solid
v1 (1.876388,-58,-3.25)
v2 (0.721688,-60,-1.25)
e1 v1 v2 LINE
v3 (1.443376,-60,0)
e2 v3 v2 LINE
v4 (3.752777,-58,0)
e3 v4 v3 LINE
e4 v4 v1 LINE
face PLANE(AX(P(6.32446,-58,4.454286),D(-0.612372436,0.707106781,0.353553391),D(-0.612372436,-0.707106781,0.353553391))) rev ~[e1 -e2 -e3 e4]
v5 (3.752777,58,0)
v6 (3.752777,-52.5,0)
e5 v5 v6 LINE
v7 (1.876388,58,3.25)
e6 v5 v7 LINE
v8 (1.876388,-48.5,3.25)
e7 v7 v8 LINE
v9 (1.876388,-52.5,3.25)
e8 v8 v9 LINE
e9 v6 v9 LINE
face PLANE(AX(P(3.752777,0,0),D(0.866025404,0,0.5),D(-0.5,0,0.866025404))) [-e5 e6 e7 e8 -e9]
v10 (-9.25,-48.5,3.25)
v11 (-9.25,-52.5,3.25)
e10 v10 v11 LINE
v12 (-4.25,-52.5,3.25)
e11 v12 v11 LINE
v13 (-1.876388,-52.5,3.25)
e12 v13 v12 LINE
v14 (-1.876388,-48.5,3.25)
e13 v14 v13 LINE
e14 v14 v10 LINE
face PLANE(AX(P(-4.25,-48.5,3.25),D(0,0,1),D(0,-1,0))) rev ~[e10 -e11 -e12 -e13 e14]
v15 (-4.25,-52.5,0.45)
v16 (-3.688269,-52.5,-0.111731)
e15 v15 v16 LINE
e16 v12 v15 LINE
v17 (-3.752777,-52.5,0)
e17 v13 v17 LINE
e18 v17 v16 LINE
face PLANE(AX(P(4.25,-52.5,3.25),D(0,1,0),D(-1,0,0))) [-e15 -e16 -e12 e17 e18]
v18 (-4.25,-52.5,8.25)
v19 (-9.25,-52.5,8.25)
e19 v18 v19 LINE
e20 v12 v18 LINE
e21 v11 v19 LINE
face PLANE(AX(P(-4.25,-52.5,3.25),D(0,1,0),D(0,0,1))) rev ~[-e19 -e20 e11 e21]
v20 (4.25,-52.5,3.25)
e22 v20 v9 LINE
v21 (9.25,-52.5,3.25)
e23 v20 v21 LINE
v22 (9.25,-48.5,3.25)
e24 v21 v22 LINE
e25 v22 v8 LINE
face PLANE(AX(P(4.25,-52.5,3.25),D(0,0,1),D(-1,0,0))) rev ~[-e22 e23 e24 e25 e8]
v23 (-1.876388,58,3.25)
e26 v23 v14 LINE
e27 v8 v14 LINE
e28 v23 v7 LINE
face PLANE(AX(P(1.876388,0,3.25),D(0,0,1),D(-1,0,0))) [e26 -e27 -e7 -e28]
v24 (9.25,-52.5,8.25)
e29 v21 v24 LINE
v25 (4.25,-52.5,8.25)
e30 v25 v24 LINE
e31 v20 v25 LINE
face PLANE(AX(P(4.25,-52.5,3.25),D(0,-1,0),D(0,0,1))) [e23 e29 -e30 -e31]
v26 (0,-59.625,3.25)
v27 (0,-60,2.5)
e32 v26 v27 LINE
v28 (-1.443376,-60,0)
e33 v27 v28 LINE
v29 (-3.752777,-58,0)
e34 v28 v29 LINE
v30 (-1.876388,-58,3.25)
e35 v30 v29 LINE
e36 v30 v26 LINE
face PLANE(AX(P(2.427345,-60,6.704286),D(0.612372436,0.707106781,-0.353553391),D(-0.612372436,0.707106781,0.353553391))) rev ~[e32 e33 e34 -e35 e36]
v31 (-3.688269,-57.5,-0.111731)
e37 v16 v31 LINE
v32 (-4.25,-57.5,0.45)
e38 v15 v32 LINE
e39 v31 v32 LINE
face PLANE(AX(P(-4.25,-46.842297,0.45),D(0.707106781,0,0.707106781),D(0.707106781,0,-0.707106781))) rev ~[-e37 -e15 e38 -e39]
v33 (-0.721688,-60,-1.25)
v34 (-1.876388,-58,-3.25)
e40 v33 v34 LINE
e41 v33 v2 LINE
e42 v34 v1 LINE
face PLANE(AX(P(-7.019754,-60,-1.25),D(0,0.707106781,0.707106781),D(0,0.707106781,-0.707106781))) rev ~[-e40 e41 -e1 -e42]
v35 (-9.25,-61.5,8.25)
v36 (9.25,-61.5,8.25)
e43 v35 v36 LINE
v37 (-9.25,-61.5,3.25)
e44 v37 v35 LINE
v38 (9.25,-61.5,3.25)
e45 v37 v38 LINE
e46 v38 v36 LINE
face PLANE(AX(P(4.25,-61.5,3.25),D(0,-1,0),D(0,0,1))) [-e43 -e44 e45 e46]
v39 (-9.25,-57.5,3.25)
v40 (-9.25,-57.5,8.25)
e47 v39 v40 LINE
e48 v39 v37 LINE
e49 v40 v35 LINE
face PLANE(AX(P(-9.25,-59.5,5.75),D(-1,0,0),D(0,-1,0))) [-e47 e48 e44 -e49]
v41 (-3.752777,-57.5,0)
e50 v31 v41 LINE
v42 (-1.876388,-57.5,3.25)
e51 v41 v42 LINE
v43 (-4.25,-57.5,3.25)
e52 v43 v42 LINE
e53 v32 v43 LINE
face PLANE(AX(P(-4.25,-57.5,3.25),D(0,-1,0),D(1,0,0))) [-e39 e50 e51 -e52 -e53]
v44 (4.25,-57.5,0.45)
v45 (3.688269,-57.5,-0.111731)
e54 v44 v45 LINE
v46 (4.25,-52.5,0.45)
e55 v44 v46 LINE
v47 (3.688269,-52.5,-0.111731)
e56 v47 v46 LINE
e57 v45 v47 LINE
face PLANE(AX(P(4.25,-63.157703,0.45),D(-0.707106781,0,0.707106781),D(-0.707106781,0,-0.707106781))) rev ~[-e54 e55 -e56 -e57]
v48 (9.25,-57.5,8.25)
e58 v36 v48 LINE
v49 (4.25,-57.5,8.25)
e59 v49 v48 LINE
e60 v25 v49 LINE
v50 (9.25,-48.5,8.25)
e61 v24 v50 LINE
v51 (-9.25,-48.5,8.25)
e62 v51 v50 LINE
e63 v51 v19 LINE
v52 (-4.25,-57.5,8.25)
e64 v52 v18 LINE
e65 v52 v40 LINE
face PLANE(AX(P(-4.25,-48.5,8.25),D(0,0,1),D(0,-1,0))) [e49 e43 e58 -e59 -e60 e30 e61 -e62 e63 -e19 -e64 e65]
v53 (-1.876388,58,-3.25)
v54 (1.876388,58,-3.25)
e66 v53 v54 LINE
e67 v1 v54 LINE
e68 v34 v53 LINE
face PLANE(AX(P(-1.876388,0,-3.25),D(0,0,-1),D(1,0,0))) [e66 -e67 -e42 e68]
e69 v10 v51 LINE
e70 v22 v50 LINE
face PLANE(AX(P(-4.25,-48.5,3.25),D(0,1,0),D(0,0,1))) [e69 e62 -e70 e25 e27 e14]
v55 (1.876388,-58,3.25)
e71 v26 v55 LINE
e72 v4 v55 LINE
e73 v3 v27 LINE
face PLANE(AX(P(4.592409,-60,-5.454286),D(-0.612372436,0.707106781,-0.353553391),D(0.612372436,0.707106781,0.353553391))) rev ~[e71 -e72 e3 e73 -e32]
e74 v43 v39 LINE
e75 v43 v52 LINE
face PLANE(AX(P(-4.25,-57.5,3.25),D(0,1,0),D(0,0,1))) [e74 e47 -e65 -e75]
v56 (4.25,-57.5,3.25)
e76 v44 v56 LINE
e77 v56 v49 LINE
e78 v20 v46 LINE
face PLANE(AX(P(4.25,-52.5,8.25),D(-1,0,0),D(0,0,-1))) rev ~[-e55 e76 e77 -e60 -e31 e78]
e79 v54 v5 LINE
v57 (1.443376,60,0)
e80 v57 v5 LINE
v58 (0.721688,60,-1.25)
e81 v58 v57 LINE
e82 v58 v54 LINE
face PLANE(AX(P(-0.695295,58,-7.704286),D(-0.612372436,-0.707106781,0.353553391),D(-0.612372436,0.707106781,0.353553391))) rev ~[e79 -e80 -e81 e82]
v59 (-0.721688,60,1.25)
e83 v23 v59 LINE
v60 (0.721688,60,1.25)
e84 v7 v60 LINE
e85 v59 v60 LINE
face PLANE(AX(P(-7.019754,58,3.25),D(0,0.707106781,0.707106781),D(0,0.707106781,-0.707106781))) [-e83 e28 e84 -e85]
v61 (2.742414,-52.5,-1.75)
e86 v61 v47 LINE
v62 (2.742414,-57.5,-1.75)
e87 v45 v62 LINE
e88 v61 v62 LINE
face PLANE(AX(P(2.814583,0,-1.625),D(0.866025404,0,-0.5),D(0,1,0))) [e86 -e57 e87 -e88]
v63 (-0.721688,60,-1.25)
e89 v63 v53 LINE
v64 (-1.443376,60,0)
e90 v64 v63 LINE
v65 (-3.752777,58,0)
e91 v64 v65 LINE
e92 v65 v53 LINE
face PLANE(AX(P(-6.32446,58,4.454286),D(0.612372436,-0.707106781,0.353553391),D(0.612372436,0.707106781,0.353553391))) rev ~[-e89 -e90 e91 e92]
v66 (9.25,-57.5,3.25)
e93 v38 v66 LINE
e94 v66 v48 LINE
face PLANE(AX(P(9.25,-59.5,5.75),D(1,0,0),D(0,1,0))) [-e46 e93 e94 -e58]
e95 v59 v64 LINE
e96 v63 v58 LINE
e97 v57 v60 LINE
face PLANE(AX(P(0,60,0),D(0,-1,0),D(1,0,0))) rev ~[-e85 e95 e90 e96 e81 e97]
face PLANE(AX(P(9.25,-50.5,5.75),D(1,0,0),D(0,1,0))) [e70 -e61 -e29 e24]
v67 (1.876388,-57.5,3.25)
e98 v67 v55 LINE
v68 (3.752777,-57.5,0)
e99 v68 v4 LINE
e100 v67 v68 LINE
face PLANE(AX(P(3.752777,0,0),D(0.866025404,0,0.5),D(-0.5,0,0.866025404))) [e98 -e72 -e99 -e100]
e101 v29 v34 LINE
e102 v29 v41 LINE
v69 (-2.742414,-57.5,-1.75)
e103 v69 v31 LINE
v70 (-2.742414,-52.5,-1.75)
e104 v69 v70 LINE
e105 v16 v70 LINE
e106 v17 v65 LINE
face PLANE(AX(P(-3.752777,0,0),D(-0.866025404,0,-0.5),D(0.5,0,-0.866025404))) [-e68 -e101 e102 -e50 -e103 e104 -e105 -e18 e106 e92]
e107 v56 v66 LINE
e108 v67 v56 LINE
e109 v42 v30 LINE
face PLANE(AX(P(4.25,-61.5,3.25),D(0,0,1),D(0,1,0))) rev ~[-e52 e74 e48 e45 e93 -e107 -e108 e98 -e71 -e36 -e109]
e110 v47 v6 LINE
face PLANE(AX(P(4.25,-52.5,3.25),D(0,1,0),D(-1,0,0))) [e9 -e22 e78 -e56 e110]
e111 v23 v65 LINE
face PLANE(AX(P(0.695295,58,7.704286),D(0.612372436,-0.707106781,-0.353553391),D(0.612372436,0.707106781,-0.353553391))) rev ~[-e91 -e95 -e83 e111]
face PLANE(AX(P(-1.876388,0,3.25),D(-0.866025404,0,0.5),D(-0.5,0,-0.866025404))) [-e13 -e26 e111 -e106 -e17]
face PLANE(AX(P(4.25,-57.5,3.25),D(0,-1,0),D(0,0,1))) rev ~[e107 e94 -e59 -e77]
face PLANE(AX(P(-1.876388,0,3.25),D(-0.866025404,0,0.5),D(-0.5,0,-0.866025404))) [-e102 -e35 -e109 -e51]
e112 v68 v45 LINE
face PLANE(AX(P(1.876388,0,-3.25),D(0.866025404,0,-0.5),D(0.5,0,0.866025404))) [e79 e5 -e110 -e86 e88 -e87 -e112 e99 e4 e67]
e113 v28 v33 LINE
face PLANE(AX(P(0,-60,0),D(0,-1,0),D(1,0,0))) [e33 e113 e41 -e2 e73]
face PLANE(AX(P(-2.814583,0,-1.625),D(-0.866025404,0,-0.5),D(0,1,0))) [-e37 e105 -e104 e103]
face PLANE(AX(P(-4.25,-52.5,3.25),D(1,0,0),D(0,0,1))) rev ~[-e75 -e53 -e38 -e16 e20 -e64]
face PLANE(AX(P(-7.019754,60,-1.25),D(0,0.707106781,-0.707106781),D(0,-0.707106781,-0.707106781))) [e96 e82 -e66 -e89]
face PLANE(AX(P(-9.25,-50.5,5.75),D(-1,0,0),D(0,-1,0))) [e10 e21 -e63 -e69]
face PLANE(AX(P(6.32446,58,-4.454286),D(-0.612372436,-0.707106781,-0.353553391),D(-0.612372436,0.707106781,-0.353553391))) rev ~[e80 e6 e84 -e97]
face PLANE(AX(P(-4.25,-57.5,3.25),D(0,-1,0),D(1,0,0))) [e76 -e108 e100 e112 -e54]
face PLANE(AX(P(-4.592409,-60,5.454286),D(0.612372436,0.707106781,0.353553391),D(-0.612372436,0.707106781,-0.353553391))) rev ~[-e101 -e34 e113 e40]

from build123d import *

# Parameters (mm, degrees)
F1_DEPTH      = 60
F2_W          = 2.3736116251
F2_H          = 5
F2_W_2        = 3.7527767497
F3_DEPTH      = 5
F5_DEPTH      = 4
F7_DEPTH      = 4
F8_W          = 4
F8_H          = 5
F9_DEPTH      = 5
F10_W         = 4
F10_H         = 5
F11_DEPTH     = 5
F12_T4_DEPTH  = 16.3154051471
F12_T9_DEPTH  = 16.3154051471
F13_T1_DEPTH  = 14.0395087016
F13_T3_DEPTH  = 14.0395087016
F13_T5_DEPTH  = 14.0395087016
F13_T7_DEPTH  = 14.0395087016
F13_T9_DEPTH  = 14.0395087016
F13_T14_DEPTH = 14.0395087016
F13_T19_DEPTH = 14.0395087016
F13_T24_DEPTH = 14.0395087016
F13_T29_DEPTH = 14.0395087016


# Not quite as in the source:
# - a fillet or chamfer that OpenCascade refuses, or shapes differently, is made with other operations: its cross-section is extruded or revolved along the edge and cut away or added


with BuildPart() as f1:
    # F0 (on Front) → F1 (new body, symmetric)
    with BuildSketch(Plane.XZ):
        Polygon((1.8763883749, -3.25), (3.7527767497, 0), (1.8763883749, 3.25), (-1.8763883749, 3.25), (-3.7527767497, 0), (-1.8763883749, -3.25), align=None)
    extrude(amount=F1_DEPTH, both=True)

    # F2 (on face) → F3 (join, symmetric)
    with BuildSketch(Plane.XY.offset(3.25)):
        with Locations((-3.0631941874, -55)):
            Rectangle(F2_W, F2_H)
        with Locations((0, -55)):
            Rectangle(F2_W_2, F2_H)
        with Locations((3.0631941874, -55)):
            Rectangle(F2_W, F2_H)
    extrude(amount=F3_DEPTH, both=True)

    # F4 (on face) → F5 (join)
    with BuildSketch(Plane.XZ.offset(57.5)):
        Polygon((-4.25, 8.25), (-4.25, 3.25), (-1.8763883749, 3.25), (1.8763883749, 3.25), (4.25, 3.25), (4.25, 8.25), align=None)
    extrude(amount=F5_DEPTH)

    # F6 (on face) → F7 (join)
    with BuildSketch(Plane(origin=(0, -52.5, 0), x_dir=(-1, 0, 0), z_dir=(0, 1, 0))):
        Polygon((-4.25, 8.25), (-4.25, 3.25), (-1.8763883749, 3.25), (1.8763883749, 3.25), (4.25, 3.25), (4.25, 8.25), align=None)
    extrude(amount=F7_DEPTH)

    # F8 (on face) → F9 (join)
    with BuildSketch(Plane.YZ.offset(4.25)):
        with Locations((-59.5, 5.75)):
            Rectangle(F8_W, F8_H)
        with Locations((-50.5, 5.75)):
            Rectangle(F8_W, F8_H)
    extrude(amount=F9_DEPTH)

    # F10 (on face) → F11 (join)
    with BuildSketch(Plane(origin=(-4.25, 0, 0), x_dir=(0, -1, 0), z_dir=(-1, 0, 0))):
        with Locations((50.5, 5.75)):
            Rectangle(F10_W, F10_H)
        with Locations((59.5, 5.75)):
            Rectangle(F10_W, F10_H)
    extrude(amount=F11_DEPTH)

    # F12: chamfer of 2.2 on 2 edges, made by hand


with BuildPart() as f12_tool2:
    # F12_s3 → F12_t4 (new body)
    with BuildSketch(Plane.XZ.offset(63.1577025735)):
        Polygon((4.25, 0.45), (2.05, -1.75), (4.25, -1.75), align=None)
    extrude(amount=-F12_T4_DEPTH)

    split(bisect_by=Plane(origin=(2.8145825623, 0, -1.625), x_dir=(0, 1, 0), z_dir=(0.8660254038, 0, -0.5)), keep=Keep.TOP)


with BuildPart() as f1_1:
    add(f1.part)

    # F12_t1: cut F12_tool2
    add(f12_tool2.part, mode=Mode.SUBTRACT)


with BuildPart() as f12_tool7:
    # F12_s8 → F12_t9 (new body)
    with BuildSketch(Plane.XZ.offset(46.8422974265)):
        Polygon((-4.25, 0.45), (-2.05, -1.75), (-4.25, -1.75), align=None)
    extrude(amount=F12_T9_DEPTH)

    split(bisect_by=Plane(origin=(-2.8145825623, 0, -1.625), x_dir=(0, 1, 0), z_dir=(-0.8660254038, 0, -0.5)), keep=Keep.TOP)


with BuildPart() as f1_2:
    add(f1_1.part)

    # F12_t6: cut F12_tool7
    add(f12_tool7.part, mode=Mode.SUBTRACT)

    # F13: chamfer of 2 on 11 edges, made by hand

    # F13_s2 → F13_t1 (cut)
    with BuildSketch(Plane(origin=(-3.5098771754, 0, -6.0792855961), x_dir=(0, 1, 0), z_dir=(0.5, 0, 0.8660254038))):
        Polygon((58, -3.25), (60, -1.25), (60, -3.25), align=None)
    extrude(amount=F13_T1_DEPTH, mode=Mode.SUBTRACT)

    # F13_s4 → F13_t3 (cut)
    with BuildSketch(Plane(origin=(3.5098771754, 0, -6.0792855961), x_dir=(0, 1, 0), z_dir=(-0.5, 0, 0.8660254038))):
        Polygon((58, -3.25), (60, -1.25), (60, -3.25), align=None)
    extrude(amount=F13_T3_DEPTH, mode=Mode.SUBTRACT)

    # F13_s6 → F13_t5 (cut)
    with BuildSketch(Plane.YZ.offset(-7.0197543508)):
        Polygon((58, 3.25), (60, 1.25), (60, 3.25), align=None)
        Polygon((60, -1.25), (58, -3.25), (60, -3.25), align=None)
        Polygon((-60, -1.25), (-58, -3.25), (-60, -3.25), align=None)
    extrude(amount=F13_T5_DEPTH, mode=Mode.SUBTRACT)

    # F13_s8 → F13_t7 (cut)
    with BuildSketch(Plane(origin=(3.5098771754, 0, 6.0792855961), x_dir=(0, 1, 0), z_dir=(-0.5, 0, -0.8660254038))):
        Polygon((58, -3.25), (60, -1.25), (60, -3.25), align=None)
    extrude(amount=F13_T7_DEPTH, mode=Mode.SUBTRACT)

    # F13_s10 → F13_t9 (cut)
    with BuildSketch(Plane(origin=(-3.5098771754, 0, 6.0792855961), x_dir=(0, 1, 0), z_dir=(0.5, 0, -0.8660254038))):
        Polygon((58, -3.25), (60, -1.25), (60, -3.25), align=None)
    extrude(amount=F13_T9_DEPTH, mode=Mode.SUBTRACT)


with BuildPart() as f13_tool12:
    # F13_s13 → F13_t14 (new body)
    with BuildSketch(Plane(origin=(-3.5098771754, 0, 6.0792855961), x_dir=(0, 1, 0), z_dir=(0.5, 0, -0.8660254038))):
        Polygon((-60, -1.25), (-58, -3.25), (-60, -3.25), align=None)
    extrude(amount=F13_T14_DEPTH)

    split(bisect_by=Plane.XY.offset(3.25), keep=Keep.BOTTOM)


with BuildPart() as f1_3:
    add(f1_2.part)

    # F13_t11: cut F13_tool12
    add(f13_tool12.part, mode=Mode.SUBTRACT)


with BuildPart() as f13_tool17:
    # F13_s18 → F13_t19 (new body)
    with BuildSketch(Plane(origin=(3.5098771754, 0, 6.0792855961), x_dir=(0, 1, 0), z_dir=(-0.5, 0, -0.8660254038))):
        Polygon((-58, 3.25), (-60, 1.25), (-60, 3.25), align=None)
    extrude(amount=F13_T19_DEPTH)

    split(bisect_by=Plane(origin=(2.8145825623, 0, 1.625), x_dir=(0, 1, 0), z_dir=(-0.8660254038, 0, -0.5)), keep=Keep.TOP)


with BuildPart() as f1_4:
    add(f1_3.part)

    # F13_t16: cut F13_tool17
    add(f13_tool17.part, mode=Mode.SUBTRACT)


with BuildPart() as f13_tool22:
    # F13_s23 → F13_t24 (new body)
    with BuildSketch(Plane(origin=(3.5098771754, 0, -6.0792855961), x_dir=(0, 1, 0), z_dir=(-0.5, 0, 0.8660254038))):
        Polygon((-60, -1.25), (-58, -3.25), (-60, -3.25), align=None)
    extrude(amount=F13_T24_DEPTH)

    split(bisect_by=Plane.XY.offset(3.25), keep=Keep.BOTTOM)


with BuildPart() as f1_5:
    add(f1_4.part)

    # F13_t21: cut F13_tool22
    add(f13_tool22.part, mode=Mode.SUBTRACT)


with BuildPart() as f13_tool27:
    # F13_s28 → F13_t29 (new body)
    with BuildSketch(Plane(origin=(3.5098771754, 0, 6.0792855961), x_dir=(0, 1, 0), z_dir=(-0.5, 0, -0.8660254038))):
        Polygon((-60, -1.25), (-58, -3.25), (-60, -3.25), align=None)
    extrude(amount=F13_T29_DEPTH)

    split(bisect_by=Plane.XY.offset(3.25), keep=Keep.BOTTOM)


with BuildPart() as f1_6:
    add(f1_5.part)

    # F13_t26: cut F13_tool27
    add(f13_tool27.part, mode=Mode.SUBTRACT)


solid = f1_6.part
